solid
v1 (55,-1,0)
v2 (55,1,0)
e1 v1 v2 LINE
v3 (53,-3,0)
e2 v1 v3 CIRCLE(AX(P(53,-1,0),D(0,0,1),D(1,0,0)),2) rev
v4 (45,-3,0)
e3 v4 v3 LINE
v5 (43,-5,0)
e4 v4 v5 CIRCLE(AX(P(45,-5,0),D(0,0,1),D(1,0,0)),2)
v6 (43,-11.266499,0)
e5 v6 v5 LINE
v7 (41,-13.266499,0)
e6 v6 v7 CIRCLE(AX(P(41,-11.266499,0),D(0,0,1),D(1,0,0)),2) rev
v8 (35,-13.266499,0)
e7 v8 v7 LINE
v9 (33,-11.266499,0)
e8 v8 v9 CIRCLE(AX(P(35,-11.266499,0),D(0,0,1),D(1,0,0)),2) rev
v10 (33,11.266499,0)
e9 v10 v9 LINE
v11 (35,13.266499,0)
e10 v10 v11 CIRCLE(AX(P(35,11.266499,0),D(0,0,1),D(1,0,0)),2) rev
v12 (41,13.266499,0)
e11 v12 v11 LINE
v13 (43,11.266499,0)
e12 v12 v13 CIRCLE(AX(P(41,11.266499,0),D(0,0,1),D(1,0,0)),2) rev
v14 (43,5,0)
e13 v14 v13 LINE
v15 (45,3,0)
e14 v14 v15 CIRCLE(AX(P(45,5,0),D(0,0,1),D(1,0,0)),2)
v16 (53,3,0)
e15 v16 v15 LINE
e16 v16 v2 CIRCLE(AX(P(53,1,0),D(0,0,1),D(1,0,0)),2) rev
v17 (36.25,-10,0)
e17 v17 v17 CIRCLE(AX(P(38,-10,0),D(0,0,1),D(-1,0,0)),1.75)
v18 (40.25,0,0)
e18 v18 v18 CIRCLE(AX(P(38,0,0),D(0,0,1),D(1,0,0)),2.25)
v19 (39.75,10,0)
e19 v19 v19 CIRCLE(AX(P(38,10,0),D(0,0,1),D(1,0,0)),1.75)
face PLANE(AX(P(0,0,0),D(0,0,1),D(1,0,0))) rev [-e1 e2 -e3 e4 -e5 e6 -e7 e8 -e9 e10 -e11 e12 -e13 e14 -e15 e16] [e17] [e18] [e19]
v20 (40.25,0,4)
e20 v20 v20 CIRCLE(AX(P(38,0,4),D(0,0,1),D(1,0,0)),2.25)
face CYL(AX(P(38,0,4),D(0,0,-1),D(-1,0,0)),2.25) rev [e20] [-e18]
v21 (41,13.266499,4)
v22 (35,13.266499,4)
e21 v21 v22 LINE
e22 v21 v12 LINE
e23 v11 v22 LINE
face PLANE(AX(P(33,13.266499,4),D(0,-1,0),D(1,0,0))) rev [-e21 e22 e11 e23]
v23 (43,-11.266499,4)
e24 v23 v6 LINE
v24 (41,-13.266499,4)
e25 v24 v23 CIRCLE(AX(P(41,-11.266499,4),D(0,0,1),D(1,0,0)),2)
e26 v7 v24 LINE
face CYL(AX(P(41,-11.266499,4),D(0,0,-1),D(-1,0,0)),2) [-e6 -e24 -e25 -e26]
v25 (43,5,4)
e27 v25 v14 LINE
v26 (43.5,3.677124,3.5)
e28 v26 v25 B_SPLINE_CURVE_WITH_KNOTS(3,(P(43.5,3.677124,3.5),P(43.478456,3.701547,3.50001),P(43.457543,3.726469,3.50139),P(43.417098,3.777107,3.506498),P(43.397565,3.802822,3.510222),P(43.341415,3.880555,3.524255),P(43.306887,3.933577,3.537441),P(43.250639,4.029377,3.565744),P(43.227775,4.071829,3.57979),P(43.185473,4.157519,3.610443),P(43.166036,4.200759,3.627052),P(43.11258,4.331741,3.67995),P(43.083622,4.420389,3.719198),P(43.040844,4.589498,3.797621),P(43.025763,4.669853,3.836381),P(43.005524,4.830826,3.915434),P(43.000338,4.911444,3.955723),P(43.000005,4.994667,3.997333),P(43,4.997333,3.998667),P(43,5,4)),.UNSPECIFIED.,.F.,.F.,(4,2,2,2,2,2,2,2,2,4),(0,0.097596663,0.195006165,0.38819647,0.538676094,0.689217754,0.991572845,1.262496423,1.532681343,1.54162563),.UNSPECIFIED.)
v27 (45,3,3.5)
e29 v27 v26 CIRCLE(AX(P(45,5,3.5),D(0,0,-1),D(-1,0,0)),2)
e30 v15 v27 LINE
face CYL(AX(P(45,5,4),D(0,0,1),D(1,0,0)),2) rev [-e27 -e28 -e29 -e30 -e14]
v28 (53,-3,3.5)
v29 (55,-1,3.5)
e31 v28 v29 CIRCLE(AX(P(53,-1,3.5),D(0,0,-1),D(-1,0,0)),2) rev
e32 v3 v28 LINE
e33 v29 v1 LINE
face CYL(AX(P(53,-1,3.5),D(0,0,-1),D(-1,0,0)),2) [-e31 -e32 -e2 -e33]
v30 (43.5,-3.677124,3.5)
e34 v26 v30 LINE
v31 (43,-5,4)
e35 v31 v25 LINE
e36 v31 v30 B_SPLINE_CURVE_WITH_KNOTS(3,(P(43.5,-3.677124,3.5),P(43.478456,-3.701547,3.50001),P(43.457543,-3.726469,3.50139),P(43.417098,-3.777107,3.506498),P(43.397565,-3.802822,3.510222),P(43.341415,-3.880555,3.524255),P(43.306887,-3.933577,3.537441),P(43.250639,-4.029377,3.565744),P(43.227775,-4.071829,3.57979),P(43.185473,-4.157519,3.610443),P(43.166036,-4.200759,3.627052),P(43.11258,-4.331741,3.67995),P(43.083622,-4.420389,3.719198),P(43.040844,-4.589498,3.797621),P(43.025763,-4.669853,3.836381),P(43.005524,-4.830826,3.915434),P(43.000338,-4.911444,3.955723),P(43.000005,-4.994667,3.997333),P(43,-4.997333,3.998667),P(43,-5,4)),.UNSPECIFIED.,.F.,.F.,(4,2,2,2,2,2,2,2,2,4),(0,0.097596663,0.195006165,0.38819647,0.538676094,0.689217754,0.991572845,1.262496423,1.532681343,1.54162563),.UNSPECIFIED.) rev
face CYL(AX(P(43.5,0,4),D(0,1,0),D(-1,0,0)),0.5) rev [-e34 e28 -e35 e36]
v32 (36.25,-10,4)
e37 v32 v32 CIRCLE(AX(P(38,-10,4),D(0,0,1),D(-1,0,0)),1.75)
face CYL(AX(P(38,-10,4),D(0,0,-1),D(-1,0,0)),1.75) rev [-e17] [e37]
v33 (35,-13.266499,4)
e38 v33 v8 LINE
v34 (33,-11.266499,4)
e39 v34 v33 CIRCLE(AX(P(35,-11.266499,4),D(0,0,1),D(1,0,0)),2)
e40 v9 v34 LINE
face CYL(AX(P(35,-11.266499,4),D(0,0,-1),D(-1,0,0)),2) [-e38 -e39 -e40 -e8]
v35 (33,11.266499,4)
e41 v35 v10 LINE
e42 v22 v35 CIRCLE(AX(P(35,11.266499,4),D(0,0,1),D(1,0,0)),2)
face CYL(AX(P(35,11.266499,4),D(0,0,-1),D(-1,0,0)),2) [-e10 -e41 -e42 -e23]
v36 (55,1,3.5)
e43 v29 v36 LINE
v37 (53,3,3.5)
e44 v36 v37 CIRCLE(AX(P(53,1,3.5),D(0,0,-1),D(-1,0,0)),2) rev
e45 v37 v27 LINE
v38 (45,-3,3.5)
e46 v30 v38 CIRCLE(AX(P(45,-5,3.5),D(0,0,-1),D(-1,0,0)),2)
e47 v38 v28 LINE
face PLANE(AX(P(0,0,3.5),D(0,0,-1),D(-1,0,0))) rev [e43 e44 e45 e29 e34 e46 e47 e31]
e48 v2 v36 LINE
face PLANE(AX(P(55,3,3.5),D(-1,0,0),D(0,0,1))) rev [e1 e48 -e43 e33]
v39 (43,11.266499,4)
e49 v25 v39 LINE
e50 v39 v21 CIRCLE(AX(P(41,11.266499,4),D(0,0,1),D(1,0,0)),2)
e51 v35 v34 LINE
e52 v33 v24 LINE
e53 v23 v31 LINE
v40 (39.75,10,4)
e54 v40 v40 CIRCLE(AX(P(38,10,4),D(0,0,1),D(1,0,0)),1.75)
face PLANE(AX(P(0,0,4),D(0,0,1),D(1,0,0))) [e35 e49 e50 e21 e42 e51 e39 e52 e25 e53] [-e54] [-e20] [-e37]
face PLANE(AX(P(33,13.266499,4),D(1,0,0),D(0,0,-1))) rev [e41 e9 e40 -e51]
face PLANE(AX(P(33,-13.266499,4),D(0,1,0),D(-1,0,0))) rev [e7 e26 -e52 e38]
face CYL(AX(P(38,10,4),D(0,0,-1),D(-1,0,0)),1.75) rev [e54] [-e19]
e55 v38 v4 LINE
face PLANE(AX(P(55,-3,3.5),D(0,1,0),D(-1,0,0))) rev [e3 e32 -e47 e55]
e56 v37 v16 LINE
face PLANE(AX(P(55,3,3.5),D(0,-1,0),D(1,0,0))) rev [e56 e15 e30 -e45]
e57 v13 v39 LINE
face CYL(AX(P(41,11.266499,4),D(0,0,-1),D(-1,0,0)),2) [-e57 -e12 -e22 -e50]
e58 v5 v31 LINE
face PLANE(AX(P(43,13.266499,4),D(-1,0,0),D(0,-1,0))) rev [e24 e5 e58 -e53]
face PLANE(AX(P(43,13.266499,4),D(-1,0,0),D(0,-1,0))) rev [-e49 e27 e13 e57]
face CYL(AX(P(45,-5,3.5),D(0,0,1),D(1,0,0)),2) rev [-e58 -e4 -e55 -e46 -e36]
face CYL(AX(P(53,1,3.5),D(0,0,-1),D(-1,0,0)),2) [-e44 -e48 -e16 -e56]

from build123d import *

# Parameters (mm, degrees)
SKETCH1_W           = 10
SKETCH1_H           = 26.532998322
SKETCH1_R           = 2.25
SKETCH1_R_2         = 1.75
BOSS_EXTRUDE1_DEPTH = 4
SKETCH6_W           = 12
SKETCH6_H           = 6
BOSS_EXTRUDE3_DEPTH = 3.5
FILLET1_R           = 2
FILLET2_R           = 2
FILLET3_R           = 0.5
FILLET4_R           = 2


with BuildPart() as part:
    # Sketch1 → Boss-Extrude1 (new body)
    with BuildSketch(Plane.XY):
        with Locations((38, 0)):
            Rectangle(SKETCH1_W, SKETCH1_H)
        with Locations((38, 0)):
            Circle(SKETCH1_R, mode=Mode.SUBTRACT)
        with Locations((38, 10)):
            Circle(SKETCH1_R_2, mode=Mode.SUBTRACT)
        with Locations(Location((38, -10, 0), (0, 0, 180))):
            Circle(SKETCH1_R_2, mode=Mode.SUBTRACT)
    extrude(amount=BOSS_EXTRUDE1_DEPTH)

    # Sketch6 → Boss-Extrude3 (add)
    with BuildSketch(Plane.XY):
        with Locations((49, 0)):
            Rectangle(SKETCH6_W, SKETCH6_H)
    extrude(amount=BOSS_EXTRUDE3_DEPTH)

    # Fillet1
    fillet1_edges = [part.edges().sort_by_distance(p)[0] for p in [
        (55, -3, 1.75),
        (55, 3, 1.75),
    ]]
    fillet(fillet1_edges, radius=FILLET1_R)

    # Fillet2
    fillet2_edges = [part.edges().sort_by_distance(p)[0] for p in [
        (43, 3, 1.75),
        (43, -3, 1.75),
    ]]
    fillet(fillet2_edges, radius=FILLET2_R)

    # Fillet3
    fillet3_edges = [part.edges().sort_by_distance(p)[0] for p in [
        (43, 0, 3.5),
    ]]
    fillet(fillet3_edges, radius=FILLET3_R - 0.0001)  # a hair under: the kernel refuses the full size

    # Fillet4
    fillet4_edges = [part.edges().sort_by_distance(p)[0] for p in [
        (43, -13.266499161, 2),
        (33, -13.266499161, 2),
        (33, 13.266499161, 2),
        (43, 13.266499161, 2),
    ]]
    fillet(fillet4_edges, radius=FILLET4_R)


solid = part.part
